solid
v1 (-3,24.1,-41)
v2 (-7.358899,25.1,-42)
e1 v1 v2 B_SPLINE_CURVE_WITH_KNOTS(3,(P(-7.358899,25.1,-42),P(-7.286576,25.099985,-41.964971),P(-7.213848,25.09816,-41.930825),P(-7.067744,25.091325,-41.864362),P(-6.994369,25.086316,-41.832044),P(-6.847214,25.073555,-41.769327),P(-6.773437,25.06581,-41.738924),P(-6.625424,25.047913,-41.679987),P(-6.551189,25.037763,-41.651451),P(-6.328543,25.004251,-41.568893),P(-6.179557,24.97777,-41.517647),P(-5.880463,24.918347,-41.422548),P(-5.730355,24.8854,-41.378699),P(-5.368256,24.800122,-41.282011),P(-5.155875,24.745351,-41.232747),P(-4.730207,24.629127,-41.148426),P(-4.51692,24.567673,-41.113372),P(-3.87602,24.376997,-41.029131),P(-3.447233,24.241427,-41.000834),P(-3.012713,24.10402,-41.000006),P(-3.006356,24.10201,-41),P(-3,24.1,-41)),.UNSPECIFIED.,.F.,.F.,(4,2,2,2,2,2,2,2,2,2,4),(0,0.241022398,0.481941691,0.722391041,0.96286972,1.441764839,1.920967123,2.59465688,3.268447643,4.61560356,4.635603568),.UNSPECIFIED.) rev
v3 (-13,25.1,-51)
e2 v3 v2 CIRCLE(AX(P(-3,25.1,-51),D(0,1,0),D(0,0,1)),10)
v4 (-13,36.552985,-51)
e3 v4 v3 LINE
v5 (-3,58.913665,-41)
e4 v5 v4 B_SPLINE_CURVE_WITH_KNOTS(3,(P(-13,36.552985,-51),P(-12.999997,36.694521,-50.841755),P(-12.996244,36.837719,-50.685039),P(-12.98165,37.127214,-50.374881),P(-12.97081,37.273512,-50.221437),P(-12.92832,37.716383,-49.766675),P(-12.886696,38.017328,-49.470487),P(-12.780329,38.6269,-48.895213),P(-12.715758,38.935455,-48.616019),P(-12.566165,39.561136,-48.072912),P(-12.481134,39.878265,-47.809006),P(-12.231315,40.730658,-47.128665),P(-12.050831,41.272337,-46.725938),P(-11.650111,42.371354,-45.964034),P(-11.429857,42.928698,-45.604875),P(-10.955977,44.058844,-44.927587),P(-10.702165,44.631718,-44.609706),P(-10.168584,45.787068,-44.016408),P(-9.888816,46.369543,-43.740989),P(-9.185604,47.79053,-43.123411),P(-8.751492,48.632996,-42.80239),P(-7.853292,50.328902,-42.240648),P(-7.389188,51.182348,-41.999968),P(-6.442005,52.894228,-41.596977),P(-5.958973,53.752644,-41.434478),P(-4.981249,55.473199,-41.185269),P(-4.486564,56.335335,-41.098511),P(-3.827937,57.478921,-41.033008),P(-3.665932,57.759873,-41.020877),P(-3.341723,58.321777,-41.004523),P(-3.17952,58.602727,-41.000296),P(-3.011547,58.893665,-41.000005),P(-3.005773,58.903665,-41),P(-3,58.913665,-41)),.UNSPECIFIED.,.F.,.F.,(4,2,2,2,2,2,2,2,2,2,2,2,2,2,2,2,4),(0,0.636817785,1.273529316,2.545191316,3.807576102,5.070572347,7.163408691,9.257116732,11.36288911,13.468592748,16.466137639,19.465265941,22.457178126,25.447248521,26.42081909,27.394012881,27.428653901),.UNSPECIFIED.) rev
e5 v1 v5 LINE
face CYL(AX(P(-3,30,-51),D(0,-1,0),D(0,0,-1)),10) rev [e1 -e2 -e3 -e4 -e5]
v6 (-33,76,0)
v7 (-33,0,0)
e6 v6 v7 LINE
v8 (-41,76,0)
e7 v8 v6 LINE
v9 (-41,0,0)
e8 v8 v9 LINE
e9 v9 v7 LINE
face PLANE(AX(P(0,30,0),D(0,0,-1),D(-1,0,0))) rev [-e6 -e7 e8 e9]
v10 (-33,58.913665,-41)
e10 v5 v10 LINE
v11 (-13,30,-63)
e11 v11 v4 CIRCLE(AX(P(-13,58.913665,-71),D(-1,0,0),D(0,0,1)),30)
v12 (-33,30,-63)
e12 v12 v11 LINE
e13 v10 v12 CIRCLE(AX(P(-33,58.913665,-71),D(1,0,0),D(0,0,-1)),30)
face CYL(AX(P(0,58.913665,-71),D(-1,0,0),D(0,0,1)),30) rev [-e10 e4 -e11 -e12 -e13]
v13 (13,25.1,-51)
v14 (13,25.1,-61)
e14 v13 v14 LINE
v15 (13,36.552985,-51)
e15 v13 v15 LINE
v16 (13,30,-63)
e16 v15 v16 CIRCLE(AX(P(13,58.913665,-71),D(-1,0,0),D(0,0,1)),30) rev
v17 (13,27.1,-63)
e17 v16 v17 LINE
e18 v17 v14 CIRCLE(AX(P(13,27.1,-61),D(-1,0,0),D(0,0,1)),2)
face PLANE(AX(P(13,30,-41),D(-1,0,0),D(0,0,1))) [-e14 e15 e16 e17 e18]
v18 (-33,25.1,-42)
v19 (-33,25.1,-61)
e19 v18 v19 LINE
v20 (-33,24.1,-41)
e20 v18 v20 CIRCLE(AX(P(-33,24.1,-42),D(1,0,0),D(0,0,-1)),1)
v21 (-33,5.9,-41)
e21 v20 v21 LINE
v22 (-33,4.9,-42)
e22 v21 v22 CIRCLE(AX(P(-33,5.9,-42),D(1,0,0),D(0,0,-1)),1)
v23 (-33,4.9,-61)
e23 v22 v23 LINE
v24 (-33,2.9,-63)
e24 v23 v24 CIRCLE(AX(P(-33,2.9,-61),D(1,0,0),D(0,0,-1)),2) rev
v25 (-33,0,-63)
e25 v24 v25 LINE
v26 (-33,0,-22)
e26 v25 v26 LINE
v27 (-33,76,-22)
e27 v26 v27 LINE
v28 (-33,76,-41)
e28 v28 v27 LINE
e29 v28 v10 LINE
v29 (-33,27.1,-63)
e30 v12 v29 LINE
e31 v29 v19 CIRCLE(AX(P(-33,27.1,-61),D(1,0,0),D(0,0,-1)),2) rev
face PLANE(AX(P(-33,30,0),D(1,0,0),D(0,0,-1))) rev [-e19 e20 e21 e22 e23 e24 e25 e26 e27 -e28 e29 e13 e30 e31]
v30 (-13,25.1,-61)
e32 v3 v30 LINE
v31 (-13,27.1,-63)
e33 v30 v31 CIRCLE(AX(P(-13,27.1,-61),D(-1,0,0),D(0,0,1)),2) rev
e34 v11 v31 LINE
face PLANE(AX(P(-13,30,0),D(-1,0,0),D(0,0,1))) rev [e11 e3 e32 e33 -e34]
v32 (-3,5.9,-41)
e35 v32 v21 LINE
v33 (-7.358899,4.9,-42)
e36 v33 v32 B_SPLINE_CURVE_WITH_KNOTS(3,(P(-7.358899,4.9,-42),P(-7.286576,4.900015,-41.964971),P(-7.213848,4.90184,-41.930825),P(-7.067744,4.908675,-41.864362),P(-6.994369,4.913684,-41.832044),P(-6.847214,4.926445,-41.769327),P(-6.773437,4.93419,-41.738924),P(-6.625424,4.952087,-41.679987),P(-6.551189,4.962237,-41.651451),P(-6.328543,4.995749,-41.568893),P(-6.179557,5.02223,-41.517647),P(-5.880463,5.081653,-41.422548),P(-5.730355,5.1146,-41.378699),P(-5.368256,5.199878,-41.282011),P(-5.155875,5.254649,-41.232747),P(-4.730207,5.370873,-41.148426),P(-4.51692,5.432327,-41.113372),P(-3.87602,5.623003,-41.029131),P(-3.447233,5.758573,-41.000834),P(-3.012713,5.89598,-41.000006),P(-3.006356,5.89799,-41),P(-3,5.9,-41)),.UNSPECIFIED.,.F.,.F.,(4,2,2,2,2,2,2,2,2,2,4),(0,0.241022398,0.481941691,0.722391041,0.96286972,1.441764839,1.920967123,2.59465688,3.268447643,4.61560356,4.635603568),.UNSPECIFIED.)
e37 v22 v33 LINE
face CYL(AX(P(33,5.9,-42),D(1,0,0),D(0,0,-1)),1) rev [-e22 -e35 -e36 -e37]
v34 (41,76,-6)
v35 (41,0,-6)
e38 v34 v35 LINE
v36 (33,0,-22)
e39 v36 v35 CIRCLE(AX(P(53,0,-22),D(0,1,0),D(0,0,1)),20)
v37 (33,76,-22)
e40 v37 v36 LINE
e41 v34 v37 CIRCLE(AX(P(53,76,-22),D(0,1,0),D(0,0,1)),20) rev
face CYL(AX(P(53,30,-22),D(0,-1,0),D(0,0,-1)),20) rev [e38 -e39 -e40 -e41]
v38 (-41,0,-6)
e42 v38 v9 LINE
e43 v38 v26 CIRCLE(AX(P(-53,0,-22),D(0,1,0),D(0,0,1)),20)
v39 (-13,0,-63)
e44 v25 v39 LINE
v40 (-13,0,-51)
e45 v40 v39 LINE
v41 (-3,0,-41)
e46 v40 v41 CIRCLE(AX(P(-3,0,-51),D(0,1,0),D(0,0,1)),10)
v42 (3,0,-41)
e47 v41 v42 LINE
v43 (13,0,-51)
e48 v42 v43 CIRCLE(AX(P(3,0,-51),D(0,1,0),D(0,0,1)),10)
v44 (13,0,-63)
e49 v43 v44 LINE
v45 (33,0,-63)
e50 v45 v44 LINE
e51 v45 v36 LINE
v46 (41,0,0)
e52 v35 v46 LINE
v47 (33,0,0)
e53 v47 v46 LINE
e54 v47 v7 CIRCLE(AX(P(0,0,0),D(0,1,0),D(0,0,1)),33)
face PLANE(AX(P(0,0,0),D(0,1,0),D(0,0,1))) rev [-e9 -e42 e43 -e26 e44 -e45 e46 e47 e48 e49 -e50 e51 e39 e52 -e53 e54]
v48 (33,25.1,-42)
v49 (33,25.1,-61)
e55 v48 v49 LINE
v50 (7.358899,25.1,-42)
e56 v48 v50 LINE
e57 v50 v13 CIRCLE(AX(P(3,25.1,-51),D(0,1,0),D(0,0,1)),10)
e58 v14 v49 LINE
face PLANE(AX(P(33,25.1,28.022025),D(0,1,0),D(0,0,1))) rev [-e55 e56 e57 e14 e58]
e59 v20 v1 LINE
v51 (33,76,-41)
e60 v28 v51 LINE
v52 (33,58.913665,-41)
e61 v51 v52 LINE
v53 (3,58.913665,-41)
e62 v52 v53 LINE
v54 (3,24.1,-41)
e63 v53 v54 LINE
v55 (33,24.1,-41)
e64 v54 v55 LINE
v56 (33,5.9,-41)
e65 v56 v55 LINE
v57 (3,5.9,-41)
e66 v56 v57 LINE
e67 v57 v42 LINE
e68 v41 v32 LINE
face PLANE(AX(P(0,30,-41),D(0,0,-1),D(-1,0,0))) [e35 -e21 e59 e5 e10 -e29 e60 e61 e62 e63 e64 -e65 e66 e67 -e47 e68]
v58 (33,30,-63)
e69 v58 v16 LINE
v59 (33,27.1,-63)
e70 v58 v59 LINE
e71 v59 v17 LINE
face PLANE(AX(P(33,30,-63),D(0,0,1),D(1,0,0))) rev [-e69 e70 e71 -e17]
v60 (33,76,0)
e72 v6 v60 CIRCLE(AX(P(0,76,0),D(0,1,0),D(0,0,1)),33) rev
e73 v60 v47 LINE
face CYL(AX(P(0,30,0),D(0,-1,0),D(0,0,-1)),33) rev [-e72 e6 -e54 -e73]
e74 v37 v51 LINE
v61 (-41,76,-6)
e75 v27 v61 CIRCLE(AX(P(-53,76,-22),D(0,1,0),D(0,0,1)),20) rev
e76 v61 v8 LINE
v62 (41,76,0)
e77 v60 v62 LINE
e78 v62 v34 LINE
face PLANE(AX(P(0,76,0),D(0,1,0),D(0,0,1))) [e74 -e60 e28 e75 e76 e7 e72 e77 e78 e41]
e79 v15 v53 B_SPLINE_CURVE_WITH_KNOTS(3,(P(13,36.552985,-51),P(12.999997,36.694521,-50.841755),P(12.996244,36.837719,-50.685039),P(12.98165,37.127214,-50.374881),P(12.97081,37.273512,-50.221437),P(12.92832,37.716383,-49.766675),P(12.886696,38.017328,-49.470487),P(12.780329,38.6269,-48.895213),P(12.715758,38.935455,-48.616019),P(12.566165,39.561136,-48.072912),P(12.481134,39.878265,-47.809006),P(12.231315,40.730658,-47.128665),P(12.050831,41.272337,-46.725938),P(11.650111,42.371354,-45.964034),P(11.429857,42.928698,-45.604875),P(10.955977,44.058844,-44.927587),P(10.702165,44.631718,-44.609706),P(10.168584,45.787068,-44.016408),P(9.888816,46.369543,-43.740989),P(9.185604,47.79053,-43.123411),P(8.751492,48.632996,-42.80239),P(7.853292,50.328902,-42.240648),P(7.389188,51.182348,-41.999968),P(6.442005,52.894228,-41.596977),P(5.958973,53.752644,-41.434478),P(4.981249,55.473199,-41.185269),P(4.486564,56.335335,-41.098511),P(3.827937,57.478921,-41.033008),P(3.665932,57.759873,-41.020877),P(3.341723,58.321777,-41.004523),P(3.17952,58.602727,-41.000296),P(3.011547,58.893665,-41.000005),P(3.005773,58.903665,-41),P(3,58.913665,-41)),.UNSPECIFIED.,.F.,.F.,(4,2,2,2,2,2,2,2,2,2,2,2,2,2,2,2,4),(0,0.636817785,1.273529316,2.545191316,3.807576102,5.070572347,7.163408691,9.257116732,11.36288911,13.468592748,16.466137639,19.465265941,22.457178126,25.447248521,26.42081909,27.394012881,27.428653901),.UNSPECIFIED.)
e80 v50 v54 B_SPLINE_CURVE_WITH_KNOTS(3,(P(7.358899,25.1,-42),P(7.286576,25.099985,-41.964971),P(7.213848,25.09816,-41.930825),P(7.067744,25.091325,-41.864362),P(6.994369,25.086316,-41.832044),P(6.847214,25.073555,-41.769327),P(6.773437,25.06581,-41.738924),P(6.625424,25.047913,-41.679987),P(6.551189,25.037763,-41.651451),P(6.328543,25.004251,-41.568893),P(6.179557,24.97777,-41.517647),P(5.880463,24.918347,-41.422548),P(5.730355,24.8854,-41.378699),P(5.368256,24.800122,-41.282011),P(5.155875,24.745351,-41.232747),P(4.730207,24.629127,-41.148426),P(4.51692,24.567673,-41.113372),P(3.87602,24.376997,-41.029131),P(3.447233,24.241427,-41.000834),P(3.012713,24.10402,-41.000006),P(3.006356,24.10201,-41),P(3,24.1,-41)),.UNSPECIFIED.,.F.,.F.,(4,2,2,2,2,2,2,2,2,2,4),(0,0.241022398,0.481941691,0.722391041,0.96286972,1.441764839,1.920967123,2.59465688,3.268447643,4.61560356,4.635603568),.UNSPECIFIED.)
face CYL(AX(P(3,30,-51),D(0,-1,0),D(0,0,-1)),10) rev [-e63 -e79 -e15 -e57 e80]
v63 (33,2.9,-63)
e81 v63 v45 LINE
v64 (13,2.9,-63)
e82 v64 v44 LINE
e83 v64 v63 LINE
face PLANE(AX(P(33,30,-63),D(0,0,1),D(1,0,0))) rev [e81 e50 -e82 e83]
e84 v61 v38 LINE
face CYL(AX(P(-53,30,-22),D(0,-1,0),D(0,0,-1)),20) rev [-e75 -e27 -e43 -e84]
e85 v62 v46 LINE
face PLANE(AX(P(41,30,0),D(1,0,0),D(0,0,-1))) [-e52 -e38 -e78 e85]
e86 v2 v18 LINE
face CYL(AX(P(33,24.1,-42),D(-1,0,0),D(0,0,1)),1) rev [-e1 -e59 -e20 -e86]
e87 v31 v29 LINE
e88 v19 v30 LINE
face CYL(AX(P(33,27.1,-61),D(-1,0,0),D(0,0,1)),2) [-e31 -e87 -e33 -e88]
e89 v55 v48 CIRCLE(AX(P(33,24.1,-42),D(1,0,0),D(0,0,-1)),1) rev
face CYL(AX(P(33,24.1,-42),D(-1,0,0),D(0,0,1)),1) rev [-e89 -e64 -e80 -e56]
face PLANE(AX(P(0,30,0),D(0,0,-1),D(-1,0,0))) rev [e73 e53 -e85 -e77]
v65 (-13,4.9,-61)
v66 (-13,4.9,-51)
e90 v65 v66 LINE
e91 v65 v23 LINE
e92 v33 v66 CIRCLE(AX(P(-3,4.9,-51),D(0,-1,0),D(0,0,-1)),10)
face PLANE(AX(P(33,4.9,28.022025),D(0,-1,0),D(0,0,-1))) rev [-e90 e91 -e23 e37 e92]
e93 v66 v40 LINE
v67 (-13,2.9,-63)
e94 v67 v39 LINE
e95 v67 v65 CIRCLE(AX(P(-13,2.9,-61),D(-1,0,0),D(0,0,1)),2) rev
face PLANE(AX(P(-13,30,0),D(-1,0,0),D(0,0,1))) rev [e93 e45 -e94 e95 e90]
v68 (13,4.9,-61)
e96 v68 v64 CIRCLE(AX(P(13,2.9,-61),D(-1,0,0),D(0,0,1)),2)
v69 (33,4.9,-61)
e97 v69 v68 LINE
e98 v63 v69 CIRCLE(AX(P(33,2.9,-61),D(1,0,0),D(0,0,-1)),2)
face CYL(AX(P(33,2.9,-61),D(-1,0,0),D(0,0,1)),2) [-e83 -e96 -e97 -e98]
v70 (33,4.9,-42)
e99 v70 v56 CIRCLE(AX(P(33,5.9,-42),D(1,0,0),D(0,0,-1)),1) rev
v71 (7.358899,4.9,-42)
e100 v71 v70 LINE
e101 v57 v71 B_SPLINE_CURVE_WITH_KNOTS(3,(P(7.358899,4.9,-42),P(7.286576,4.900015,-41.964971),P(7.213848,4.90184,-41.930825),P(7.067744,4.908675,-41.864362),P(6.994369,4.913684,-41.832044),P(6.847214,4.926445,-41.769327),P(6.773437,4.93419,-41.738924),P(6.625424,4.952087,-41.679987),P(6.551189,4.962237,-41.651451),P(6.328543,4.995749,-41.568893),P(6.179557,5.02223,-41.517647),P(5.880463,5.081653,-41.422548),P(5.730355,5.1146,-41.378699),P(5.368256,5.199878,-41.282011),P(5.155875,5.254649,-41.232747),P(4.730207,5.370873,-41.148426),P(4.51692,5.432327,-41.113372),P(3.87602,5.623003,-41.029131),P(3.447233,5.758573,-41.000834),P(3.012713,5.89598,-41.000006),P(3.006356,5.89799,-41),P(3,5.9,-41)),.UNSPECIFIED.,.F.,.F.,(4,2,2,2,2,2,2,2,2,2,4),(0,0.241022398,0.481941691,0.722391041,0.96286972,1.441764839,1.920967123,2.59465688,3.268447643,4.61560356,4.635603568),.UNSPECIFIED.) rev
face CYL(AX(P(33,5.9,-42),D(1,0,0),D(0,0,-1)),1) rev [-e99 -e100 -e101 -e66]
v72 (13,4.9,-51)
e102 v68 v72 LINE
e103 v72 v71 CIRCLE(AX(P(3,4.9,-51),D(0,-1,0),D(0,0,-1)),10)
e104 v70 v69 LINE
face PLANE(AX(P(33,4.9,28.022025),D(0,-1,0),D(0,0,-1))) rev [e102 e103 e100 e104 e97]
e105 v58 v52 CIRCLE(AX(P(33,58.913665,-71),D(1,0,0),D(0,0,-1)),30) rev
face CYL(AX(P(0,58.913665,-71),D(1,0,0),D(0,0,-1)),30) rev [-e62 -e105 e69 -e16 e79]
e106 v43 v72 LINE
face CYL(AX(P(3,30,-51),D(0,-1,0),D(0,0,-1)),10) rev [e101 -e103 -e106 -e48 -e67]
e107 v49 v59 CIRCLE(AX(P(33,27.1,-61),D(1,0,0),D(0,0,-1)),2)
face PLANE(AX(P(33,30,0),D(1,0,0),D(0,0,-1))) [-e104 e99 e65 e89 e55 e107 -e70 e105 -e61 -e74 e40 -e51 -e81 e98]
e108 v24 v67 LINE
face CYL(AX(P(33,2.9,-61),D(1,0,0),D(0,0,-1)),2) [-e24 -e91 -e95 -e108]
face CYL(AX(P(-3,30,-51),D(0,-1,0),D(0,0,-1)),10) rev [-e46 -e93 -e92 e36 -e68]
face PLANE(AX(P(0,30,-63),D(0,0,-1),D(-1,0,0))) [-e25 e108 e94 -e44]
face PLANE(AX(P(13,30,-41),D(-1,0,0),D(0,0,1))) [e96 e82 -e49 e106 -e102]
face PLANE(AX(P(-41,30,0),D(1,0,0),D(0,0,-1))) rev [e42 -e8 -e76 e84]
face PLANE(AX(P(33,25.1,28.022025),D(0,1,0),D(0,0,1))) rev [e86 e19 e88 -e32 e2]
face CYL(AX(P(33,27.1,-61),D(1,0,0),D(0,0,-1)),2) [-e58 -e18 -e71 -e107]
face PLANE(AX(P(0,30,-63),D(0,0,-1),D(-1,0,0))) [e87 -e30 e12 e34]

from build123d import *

# Parameters (mm, degrees)
SKETCH1_W           = 8
SKETCH1_H           = 6
SKETCH1_W_2         = 20
SKETCH1_H_2         = 22
BOSS_EXTRUDE1_DEPTH = 30
SKETCH2_W           = 66
SKETCH2_H           = 20.2
CUT_EXTRUDE1_DEPTH  = 22
SKETCH3_W           = 8
SKETCH3_H           = 6
BOSS_EXTRUDE2_DEPTH = 46
FILLET1_R           = 30
FILLET2_R           = 20
FILLET3_R           = 10
FILLET4_R           = 2
FILLET5_R           = 1


with BuildPart() as part:
    # Sketch1 → Boss-Extrude1 (new body)
    with BuildSketch(Plane(origin=(0, 0, 0), x_dir=(1, 0, 0), z_dir=(0, 1, 0))):
        with BuildLine():
            Line((-13, 41), (-33, 41))
            Line((-33, 41), (-33, 6))
            Line((-33, 6), (-32.449961479, 6))
            ThreePointArc((-32.449961479, 6), (0, 33), (32.449961479, 6))
            Line((32.449961479, 6), (33, 6))
            Line((33, 6), (33, 41))
            Line((33, 41), (13, 41))
            Line((13, 41), (-13, 41))
        make_face()
        with Locations((-37, 3)):
            Rectangle(SKETCH1_W, SKETCH1_H)
        with BuildLine():
            Line((-32.449961479, 6), (-33, 6))
            Line((-33, 6), (-33, 0))
            ThreePointArc((-33, 0), (-32.862202671, 3.012579558), (-32.449961479, 6))
        make_face()
        with Locations((37, 3)):
            Rectangle(SKETCH1_W, SKETCH1_H)
        with BuildLine():
            ThreePointArc((32.449961479, 6), (32.862202671, 3.012579558), (33, 0))
            Line((33, 0), (33, 6))
            Line((33, 6), (32.449961479, 6))
        make_face()
        with Locations((-23, 52)):
            Rectangle(SKETCH1_W_2, SKETCH1_H_2)
        with Locations((23, 52)):
            Rectangle(SKETCH1_W_2, SKETCH1_H_2)
    extrude(amount=BOSS_EXTRUDE1_DEPTH)

    # Sketch2 → Cut-Extrude1 (cut)
    with BuildSketch(Plane(origin=(0, 0, -63), x_dir=(-1, 0, 0), z_dir=(0, 0, -1))):
        with Locations((0, 15)):
            Rectangle(SKETCH2_W, SKETCH2_H)
    extrude(amount=-CUT_EXTRUDE1_DEPTH, mode=Mode.SUBTRACT)

    # Sketch3 → Boss-Extrude2 (add)
    with BuildSketch(Plane(origin=(0, 30, 0), x_dir=(1, 0, 0), z_dir=(0, 1, 0))):
        with BuildLine():
            Line((-33, 41), (-33, 6))
            Line((-33, 6), (-32.449961479, 6))
            ThreePointArc((-32.449961479, 6), (0, 33), (32.449961479, 6))
            Line((32.449961479, 6), (33, 6))
            Line((33, 6), (33, 41))
            Line((33, 41), (13, 41))
            Line((13, 41), (-13, 41))
            Line((-13, 41), (-33, 41))
        make_face()
        with Locations((37, 3)):
            Rectangle(SKETCH3_W, SKETCH3_H)
        with Locations((-37, 3)):
            Rectangle(SKETCH3_W, SKETCH3_H)
        with BuildLine():
            Line((-32.449961479, 6), (-33, 6))
            Line((-33, 6), (-33, 0))
            ThreePointArc((-33, 0), (-32.862202671, 3.012579558), (-32.449961479, 6))
        make_face()
        with BuildLine():
            Line((33, 6), (32.449961479, 6))
            ThreePointArc((32.449961479, 6), (32.862202671, 3.012579558), (33, 0))
            Line((33, 0), (33, 6))
        make_face()
    extrude(amount=BOSS_EXTRUDE2_DEPTH)

    # Fillet1
    # the kernel refuses this fillet: 30 mm, written as the material it adds along each edge
    with BuildSketch(Plane(origin=(59.284161474, 30, -41), x_dir=(0, 1, 0), z_dir=(-1, 0, 0))) as fillet1_piece_1_section:
        with BuildLine():
            CenterArc((28.91366459, 30), FILLET1_R, 195.466009953, 74.533990047)
            Line((0, 22), (-0.578273292, 21.84))
            ThreePointArc((-0.578273292, 21.84), (-0.6, 11), (-0.6, 0))
            Line((-0.6, 0), (0, -0.6))
            Line((0, -0.6), (28.91366459, -0.6))
            Line((28.91366459, -0.6), (28.91366459, 0))
        make_face()
    fillet1_piece_1 = extrude(amount=92.284161474, mode=Mode.PRIVATE)
    fillet1_piece_1 = split(fillet1_piece_1, bisect_by=Plane(origin=(33, 36.836030265, -46.582233156), z_dir=(-1, 0, 0)), keep=Keep.TOP, mode=Mode.PRIVATE)
    fillet1_piece_1 = split(fillet1_piece_1, bisect_by=Plane(origin=(13, 36.836030265, -46.582233156), z_dir=(1, 0, 0)), keep=Keep.TOP, mode=Mode.PRIVATE)
    add(fillet1_piece_1)
    with BuildSketch(Plane(origin=(-13, 30, -41), x_dir=(0, 1, 0), z_dir=(-1, 0, 0)), Plane(origin=(33, 30, -41), x_dir=(0, 1, 0), z_dir=(-1, 0, 0))) as fillet1_piece_2:
        with BuildLine():
            CenterArc((28.91366459, 30), FILLET1_R, 195.466009953, 74.533990047)
            Line((0, 22), (-0.578273292, 21.84))
            ThreePointArc((-0.578273292, 21.84), (-0.6, 11), (-0.6, 0))
            Line((-0.6, 0), (0, -0.6))
            Line((0, -0.6), (28.91366459, -0.6))
            Line((28.91366459, -0.6), (28.91366459, 0))
        make_face()
    extrude(amount=20)
    with BuildSketch(Plane(origin=(33, 30, -41), x_dir=(0, 1, 0), z_dir=(-1, 0, 0))) as fillet1_piece_3_section:
        with BuildLine():
            CenterArc((28.91366459, 30), FILLET1_R, 195.466009953, 74.533990047)
            Line((0, 22), (-0.578273292, 21.84))
            ThreePointArc((-0.578273292, 21.84), (-0.6, 11), (-0.6, 0))
            Line((-0.6, 0), (0, -0.6))
            Line((0, -0.6), (28.91366459, -0.6))
            Line((28.91366459, -0.6), (28.91366459, 0))
        make_face()
    fillet1_piece_3 = extrude(amount=92.284161474, mode=Mode.PRIVATE)
    fillet1_piece_3 = split(fillet1_piece_3, bisect_by=Plane(origin=(-33, 36.836030265, -46.582233156), z_dir=(1, 0, 0)), keep=Keep.TOP, mode=Mode.PRIVATE)
    fillet1_piece_3 = split(fillet1_piece_3, bisect_by=Plane(origin=(-13, 36.836030265, -46.582233156), z_dir=(-1, 0, 0)), keep=Keep.TOP, mode=Mode.PRIVATE)
    add(fillet1_piece_3)

    # Fillet2
    # the kernel refuses this fillet: 20 mm, written as the material it adds along each edge
    with BuildSketch(Plane(origin=(33, 76, -6), x_dir=(0, 0, -1), z_dir=(0, -1, 0)), Plane(origin=(-33, 0, -6), x_dir=(0, 0, -1), z_dir=(0, 1, 0))) as fillet2_piece_1:
        with BuildLine():
            CenterArc((16, 20), FILLET2_R, 216.869897646, 53.130102354)
            Line((0, 8), (-0.32, 7.76))
            ThreePointArc((-0.32, 7.76), (-0.4, 4), (-0.4, 0))
            Line((-0.4, 0), (0, -0.4))
            Line((0, -0.4), (16, -0.4))
            Line((16, -0.4), (16, 0))
        make_face()
    extrude(amount=76)

    # Fillet3
    fillet3_edges = [part.edges().sort_by_distance(p)[0] for p in [
        (-13, 42.006832295, -41),
        (13, 2.45, -41),
        (13, 42.006832295, -41),
        (-13, 2.45, -41),
    ]]
    fillet(fillet3_edges, radius=FILLET3_R)

    # Fillet4
    fillet4_edges = [part.edges().sort_by_distance(p)[0] for p in [
        (-23, 25.1, -63),
        (-23, 4.9, -63),
        (23, 25.1, -63),
        (23, 4.9, -63),
    ]]
    fillet(fillet4_edges, radius=FILLET4_R)

    # Fillet5
    fillet5_edges = [part.edges().sort_by_distance(p)[0] for p in [
        (-18, 25.1, -41),
        (-18, 4.9, -41),
        (18, 25.1, -41),
        (18, 4.9, -41),
    ]]
    fillet(fillet5_edges, radius=FILLET5_R)


solid = part.part
